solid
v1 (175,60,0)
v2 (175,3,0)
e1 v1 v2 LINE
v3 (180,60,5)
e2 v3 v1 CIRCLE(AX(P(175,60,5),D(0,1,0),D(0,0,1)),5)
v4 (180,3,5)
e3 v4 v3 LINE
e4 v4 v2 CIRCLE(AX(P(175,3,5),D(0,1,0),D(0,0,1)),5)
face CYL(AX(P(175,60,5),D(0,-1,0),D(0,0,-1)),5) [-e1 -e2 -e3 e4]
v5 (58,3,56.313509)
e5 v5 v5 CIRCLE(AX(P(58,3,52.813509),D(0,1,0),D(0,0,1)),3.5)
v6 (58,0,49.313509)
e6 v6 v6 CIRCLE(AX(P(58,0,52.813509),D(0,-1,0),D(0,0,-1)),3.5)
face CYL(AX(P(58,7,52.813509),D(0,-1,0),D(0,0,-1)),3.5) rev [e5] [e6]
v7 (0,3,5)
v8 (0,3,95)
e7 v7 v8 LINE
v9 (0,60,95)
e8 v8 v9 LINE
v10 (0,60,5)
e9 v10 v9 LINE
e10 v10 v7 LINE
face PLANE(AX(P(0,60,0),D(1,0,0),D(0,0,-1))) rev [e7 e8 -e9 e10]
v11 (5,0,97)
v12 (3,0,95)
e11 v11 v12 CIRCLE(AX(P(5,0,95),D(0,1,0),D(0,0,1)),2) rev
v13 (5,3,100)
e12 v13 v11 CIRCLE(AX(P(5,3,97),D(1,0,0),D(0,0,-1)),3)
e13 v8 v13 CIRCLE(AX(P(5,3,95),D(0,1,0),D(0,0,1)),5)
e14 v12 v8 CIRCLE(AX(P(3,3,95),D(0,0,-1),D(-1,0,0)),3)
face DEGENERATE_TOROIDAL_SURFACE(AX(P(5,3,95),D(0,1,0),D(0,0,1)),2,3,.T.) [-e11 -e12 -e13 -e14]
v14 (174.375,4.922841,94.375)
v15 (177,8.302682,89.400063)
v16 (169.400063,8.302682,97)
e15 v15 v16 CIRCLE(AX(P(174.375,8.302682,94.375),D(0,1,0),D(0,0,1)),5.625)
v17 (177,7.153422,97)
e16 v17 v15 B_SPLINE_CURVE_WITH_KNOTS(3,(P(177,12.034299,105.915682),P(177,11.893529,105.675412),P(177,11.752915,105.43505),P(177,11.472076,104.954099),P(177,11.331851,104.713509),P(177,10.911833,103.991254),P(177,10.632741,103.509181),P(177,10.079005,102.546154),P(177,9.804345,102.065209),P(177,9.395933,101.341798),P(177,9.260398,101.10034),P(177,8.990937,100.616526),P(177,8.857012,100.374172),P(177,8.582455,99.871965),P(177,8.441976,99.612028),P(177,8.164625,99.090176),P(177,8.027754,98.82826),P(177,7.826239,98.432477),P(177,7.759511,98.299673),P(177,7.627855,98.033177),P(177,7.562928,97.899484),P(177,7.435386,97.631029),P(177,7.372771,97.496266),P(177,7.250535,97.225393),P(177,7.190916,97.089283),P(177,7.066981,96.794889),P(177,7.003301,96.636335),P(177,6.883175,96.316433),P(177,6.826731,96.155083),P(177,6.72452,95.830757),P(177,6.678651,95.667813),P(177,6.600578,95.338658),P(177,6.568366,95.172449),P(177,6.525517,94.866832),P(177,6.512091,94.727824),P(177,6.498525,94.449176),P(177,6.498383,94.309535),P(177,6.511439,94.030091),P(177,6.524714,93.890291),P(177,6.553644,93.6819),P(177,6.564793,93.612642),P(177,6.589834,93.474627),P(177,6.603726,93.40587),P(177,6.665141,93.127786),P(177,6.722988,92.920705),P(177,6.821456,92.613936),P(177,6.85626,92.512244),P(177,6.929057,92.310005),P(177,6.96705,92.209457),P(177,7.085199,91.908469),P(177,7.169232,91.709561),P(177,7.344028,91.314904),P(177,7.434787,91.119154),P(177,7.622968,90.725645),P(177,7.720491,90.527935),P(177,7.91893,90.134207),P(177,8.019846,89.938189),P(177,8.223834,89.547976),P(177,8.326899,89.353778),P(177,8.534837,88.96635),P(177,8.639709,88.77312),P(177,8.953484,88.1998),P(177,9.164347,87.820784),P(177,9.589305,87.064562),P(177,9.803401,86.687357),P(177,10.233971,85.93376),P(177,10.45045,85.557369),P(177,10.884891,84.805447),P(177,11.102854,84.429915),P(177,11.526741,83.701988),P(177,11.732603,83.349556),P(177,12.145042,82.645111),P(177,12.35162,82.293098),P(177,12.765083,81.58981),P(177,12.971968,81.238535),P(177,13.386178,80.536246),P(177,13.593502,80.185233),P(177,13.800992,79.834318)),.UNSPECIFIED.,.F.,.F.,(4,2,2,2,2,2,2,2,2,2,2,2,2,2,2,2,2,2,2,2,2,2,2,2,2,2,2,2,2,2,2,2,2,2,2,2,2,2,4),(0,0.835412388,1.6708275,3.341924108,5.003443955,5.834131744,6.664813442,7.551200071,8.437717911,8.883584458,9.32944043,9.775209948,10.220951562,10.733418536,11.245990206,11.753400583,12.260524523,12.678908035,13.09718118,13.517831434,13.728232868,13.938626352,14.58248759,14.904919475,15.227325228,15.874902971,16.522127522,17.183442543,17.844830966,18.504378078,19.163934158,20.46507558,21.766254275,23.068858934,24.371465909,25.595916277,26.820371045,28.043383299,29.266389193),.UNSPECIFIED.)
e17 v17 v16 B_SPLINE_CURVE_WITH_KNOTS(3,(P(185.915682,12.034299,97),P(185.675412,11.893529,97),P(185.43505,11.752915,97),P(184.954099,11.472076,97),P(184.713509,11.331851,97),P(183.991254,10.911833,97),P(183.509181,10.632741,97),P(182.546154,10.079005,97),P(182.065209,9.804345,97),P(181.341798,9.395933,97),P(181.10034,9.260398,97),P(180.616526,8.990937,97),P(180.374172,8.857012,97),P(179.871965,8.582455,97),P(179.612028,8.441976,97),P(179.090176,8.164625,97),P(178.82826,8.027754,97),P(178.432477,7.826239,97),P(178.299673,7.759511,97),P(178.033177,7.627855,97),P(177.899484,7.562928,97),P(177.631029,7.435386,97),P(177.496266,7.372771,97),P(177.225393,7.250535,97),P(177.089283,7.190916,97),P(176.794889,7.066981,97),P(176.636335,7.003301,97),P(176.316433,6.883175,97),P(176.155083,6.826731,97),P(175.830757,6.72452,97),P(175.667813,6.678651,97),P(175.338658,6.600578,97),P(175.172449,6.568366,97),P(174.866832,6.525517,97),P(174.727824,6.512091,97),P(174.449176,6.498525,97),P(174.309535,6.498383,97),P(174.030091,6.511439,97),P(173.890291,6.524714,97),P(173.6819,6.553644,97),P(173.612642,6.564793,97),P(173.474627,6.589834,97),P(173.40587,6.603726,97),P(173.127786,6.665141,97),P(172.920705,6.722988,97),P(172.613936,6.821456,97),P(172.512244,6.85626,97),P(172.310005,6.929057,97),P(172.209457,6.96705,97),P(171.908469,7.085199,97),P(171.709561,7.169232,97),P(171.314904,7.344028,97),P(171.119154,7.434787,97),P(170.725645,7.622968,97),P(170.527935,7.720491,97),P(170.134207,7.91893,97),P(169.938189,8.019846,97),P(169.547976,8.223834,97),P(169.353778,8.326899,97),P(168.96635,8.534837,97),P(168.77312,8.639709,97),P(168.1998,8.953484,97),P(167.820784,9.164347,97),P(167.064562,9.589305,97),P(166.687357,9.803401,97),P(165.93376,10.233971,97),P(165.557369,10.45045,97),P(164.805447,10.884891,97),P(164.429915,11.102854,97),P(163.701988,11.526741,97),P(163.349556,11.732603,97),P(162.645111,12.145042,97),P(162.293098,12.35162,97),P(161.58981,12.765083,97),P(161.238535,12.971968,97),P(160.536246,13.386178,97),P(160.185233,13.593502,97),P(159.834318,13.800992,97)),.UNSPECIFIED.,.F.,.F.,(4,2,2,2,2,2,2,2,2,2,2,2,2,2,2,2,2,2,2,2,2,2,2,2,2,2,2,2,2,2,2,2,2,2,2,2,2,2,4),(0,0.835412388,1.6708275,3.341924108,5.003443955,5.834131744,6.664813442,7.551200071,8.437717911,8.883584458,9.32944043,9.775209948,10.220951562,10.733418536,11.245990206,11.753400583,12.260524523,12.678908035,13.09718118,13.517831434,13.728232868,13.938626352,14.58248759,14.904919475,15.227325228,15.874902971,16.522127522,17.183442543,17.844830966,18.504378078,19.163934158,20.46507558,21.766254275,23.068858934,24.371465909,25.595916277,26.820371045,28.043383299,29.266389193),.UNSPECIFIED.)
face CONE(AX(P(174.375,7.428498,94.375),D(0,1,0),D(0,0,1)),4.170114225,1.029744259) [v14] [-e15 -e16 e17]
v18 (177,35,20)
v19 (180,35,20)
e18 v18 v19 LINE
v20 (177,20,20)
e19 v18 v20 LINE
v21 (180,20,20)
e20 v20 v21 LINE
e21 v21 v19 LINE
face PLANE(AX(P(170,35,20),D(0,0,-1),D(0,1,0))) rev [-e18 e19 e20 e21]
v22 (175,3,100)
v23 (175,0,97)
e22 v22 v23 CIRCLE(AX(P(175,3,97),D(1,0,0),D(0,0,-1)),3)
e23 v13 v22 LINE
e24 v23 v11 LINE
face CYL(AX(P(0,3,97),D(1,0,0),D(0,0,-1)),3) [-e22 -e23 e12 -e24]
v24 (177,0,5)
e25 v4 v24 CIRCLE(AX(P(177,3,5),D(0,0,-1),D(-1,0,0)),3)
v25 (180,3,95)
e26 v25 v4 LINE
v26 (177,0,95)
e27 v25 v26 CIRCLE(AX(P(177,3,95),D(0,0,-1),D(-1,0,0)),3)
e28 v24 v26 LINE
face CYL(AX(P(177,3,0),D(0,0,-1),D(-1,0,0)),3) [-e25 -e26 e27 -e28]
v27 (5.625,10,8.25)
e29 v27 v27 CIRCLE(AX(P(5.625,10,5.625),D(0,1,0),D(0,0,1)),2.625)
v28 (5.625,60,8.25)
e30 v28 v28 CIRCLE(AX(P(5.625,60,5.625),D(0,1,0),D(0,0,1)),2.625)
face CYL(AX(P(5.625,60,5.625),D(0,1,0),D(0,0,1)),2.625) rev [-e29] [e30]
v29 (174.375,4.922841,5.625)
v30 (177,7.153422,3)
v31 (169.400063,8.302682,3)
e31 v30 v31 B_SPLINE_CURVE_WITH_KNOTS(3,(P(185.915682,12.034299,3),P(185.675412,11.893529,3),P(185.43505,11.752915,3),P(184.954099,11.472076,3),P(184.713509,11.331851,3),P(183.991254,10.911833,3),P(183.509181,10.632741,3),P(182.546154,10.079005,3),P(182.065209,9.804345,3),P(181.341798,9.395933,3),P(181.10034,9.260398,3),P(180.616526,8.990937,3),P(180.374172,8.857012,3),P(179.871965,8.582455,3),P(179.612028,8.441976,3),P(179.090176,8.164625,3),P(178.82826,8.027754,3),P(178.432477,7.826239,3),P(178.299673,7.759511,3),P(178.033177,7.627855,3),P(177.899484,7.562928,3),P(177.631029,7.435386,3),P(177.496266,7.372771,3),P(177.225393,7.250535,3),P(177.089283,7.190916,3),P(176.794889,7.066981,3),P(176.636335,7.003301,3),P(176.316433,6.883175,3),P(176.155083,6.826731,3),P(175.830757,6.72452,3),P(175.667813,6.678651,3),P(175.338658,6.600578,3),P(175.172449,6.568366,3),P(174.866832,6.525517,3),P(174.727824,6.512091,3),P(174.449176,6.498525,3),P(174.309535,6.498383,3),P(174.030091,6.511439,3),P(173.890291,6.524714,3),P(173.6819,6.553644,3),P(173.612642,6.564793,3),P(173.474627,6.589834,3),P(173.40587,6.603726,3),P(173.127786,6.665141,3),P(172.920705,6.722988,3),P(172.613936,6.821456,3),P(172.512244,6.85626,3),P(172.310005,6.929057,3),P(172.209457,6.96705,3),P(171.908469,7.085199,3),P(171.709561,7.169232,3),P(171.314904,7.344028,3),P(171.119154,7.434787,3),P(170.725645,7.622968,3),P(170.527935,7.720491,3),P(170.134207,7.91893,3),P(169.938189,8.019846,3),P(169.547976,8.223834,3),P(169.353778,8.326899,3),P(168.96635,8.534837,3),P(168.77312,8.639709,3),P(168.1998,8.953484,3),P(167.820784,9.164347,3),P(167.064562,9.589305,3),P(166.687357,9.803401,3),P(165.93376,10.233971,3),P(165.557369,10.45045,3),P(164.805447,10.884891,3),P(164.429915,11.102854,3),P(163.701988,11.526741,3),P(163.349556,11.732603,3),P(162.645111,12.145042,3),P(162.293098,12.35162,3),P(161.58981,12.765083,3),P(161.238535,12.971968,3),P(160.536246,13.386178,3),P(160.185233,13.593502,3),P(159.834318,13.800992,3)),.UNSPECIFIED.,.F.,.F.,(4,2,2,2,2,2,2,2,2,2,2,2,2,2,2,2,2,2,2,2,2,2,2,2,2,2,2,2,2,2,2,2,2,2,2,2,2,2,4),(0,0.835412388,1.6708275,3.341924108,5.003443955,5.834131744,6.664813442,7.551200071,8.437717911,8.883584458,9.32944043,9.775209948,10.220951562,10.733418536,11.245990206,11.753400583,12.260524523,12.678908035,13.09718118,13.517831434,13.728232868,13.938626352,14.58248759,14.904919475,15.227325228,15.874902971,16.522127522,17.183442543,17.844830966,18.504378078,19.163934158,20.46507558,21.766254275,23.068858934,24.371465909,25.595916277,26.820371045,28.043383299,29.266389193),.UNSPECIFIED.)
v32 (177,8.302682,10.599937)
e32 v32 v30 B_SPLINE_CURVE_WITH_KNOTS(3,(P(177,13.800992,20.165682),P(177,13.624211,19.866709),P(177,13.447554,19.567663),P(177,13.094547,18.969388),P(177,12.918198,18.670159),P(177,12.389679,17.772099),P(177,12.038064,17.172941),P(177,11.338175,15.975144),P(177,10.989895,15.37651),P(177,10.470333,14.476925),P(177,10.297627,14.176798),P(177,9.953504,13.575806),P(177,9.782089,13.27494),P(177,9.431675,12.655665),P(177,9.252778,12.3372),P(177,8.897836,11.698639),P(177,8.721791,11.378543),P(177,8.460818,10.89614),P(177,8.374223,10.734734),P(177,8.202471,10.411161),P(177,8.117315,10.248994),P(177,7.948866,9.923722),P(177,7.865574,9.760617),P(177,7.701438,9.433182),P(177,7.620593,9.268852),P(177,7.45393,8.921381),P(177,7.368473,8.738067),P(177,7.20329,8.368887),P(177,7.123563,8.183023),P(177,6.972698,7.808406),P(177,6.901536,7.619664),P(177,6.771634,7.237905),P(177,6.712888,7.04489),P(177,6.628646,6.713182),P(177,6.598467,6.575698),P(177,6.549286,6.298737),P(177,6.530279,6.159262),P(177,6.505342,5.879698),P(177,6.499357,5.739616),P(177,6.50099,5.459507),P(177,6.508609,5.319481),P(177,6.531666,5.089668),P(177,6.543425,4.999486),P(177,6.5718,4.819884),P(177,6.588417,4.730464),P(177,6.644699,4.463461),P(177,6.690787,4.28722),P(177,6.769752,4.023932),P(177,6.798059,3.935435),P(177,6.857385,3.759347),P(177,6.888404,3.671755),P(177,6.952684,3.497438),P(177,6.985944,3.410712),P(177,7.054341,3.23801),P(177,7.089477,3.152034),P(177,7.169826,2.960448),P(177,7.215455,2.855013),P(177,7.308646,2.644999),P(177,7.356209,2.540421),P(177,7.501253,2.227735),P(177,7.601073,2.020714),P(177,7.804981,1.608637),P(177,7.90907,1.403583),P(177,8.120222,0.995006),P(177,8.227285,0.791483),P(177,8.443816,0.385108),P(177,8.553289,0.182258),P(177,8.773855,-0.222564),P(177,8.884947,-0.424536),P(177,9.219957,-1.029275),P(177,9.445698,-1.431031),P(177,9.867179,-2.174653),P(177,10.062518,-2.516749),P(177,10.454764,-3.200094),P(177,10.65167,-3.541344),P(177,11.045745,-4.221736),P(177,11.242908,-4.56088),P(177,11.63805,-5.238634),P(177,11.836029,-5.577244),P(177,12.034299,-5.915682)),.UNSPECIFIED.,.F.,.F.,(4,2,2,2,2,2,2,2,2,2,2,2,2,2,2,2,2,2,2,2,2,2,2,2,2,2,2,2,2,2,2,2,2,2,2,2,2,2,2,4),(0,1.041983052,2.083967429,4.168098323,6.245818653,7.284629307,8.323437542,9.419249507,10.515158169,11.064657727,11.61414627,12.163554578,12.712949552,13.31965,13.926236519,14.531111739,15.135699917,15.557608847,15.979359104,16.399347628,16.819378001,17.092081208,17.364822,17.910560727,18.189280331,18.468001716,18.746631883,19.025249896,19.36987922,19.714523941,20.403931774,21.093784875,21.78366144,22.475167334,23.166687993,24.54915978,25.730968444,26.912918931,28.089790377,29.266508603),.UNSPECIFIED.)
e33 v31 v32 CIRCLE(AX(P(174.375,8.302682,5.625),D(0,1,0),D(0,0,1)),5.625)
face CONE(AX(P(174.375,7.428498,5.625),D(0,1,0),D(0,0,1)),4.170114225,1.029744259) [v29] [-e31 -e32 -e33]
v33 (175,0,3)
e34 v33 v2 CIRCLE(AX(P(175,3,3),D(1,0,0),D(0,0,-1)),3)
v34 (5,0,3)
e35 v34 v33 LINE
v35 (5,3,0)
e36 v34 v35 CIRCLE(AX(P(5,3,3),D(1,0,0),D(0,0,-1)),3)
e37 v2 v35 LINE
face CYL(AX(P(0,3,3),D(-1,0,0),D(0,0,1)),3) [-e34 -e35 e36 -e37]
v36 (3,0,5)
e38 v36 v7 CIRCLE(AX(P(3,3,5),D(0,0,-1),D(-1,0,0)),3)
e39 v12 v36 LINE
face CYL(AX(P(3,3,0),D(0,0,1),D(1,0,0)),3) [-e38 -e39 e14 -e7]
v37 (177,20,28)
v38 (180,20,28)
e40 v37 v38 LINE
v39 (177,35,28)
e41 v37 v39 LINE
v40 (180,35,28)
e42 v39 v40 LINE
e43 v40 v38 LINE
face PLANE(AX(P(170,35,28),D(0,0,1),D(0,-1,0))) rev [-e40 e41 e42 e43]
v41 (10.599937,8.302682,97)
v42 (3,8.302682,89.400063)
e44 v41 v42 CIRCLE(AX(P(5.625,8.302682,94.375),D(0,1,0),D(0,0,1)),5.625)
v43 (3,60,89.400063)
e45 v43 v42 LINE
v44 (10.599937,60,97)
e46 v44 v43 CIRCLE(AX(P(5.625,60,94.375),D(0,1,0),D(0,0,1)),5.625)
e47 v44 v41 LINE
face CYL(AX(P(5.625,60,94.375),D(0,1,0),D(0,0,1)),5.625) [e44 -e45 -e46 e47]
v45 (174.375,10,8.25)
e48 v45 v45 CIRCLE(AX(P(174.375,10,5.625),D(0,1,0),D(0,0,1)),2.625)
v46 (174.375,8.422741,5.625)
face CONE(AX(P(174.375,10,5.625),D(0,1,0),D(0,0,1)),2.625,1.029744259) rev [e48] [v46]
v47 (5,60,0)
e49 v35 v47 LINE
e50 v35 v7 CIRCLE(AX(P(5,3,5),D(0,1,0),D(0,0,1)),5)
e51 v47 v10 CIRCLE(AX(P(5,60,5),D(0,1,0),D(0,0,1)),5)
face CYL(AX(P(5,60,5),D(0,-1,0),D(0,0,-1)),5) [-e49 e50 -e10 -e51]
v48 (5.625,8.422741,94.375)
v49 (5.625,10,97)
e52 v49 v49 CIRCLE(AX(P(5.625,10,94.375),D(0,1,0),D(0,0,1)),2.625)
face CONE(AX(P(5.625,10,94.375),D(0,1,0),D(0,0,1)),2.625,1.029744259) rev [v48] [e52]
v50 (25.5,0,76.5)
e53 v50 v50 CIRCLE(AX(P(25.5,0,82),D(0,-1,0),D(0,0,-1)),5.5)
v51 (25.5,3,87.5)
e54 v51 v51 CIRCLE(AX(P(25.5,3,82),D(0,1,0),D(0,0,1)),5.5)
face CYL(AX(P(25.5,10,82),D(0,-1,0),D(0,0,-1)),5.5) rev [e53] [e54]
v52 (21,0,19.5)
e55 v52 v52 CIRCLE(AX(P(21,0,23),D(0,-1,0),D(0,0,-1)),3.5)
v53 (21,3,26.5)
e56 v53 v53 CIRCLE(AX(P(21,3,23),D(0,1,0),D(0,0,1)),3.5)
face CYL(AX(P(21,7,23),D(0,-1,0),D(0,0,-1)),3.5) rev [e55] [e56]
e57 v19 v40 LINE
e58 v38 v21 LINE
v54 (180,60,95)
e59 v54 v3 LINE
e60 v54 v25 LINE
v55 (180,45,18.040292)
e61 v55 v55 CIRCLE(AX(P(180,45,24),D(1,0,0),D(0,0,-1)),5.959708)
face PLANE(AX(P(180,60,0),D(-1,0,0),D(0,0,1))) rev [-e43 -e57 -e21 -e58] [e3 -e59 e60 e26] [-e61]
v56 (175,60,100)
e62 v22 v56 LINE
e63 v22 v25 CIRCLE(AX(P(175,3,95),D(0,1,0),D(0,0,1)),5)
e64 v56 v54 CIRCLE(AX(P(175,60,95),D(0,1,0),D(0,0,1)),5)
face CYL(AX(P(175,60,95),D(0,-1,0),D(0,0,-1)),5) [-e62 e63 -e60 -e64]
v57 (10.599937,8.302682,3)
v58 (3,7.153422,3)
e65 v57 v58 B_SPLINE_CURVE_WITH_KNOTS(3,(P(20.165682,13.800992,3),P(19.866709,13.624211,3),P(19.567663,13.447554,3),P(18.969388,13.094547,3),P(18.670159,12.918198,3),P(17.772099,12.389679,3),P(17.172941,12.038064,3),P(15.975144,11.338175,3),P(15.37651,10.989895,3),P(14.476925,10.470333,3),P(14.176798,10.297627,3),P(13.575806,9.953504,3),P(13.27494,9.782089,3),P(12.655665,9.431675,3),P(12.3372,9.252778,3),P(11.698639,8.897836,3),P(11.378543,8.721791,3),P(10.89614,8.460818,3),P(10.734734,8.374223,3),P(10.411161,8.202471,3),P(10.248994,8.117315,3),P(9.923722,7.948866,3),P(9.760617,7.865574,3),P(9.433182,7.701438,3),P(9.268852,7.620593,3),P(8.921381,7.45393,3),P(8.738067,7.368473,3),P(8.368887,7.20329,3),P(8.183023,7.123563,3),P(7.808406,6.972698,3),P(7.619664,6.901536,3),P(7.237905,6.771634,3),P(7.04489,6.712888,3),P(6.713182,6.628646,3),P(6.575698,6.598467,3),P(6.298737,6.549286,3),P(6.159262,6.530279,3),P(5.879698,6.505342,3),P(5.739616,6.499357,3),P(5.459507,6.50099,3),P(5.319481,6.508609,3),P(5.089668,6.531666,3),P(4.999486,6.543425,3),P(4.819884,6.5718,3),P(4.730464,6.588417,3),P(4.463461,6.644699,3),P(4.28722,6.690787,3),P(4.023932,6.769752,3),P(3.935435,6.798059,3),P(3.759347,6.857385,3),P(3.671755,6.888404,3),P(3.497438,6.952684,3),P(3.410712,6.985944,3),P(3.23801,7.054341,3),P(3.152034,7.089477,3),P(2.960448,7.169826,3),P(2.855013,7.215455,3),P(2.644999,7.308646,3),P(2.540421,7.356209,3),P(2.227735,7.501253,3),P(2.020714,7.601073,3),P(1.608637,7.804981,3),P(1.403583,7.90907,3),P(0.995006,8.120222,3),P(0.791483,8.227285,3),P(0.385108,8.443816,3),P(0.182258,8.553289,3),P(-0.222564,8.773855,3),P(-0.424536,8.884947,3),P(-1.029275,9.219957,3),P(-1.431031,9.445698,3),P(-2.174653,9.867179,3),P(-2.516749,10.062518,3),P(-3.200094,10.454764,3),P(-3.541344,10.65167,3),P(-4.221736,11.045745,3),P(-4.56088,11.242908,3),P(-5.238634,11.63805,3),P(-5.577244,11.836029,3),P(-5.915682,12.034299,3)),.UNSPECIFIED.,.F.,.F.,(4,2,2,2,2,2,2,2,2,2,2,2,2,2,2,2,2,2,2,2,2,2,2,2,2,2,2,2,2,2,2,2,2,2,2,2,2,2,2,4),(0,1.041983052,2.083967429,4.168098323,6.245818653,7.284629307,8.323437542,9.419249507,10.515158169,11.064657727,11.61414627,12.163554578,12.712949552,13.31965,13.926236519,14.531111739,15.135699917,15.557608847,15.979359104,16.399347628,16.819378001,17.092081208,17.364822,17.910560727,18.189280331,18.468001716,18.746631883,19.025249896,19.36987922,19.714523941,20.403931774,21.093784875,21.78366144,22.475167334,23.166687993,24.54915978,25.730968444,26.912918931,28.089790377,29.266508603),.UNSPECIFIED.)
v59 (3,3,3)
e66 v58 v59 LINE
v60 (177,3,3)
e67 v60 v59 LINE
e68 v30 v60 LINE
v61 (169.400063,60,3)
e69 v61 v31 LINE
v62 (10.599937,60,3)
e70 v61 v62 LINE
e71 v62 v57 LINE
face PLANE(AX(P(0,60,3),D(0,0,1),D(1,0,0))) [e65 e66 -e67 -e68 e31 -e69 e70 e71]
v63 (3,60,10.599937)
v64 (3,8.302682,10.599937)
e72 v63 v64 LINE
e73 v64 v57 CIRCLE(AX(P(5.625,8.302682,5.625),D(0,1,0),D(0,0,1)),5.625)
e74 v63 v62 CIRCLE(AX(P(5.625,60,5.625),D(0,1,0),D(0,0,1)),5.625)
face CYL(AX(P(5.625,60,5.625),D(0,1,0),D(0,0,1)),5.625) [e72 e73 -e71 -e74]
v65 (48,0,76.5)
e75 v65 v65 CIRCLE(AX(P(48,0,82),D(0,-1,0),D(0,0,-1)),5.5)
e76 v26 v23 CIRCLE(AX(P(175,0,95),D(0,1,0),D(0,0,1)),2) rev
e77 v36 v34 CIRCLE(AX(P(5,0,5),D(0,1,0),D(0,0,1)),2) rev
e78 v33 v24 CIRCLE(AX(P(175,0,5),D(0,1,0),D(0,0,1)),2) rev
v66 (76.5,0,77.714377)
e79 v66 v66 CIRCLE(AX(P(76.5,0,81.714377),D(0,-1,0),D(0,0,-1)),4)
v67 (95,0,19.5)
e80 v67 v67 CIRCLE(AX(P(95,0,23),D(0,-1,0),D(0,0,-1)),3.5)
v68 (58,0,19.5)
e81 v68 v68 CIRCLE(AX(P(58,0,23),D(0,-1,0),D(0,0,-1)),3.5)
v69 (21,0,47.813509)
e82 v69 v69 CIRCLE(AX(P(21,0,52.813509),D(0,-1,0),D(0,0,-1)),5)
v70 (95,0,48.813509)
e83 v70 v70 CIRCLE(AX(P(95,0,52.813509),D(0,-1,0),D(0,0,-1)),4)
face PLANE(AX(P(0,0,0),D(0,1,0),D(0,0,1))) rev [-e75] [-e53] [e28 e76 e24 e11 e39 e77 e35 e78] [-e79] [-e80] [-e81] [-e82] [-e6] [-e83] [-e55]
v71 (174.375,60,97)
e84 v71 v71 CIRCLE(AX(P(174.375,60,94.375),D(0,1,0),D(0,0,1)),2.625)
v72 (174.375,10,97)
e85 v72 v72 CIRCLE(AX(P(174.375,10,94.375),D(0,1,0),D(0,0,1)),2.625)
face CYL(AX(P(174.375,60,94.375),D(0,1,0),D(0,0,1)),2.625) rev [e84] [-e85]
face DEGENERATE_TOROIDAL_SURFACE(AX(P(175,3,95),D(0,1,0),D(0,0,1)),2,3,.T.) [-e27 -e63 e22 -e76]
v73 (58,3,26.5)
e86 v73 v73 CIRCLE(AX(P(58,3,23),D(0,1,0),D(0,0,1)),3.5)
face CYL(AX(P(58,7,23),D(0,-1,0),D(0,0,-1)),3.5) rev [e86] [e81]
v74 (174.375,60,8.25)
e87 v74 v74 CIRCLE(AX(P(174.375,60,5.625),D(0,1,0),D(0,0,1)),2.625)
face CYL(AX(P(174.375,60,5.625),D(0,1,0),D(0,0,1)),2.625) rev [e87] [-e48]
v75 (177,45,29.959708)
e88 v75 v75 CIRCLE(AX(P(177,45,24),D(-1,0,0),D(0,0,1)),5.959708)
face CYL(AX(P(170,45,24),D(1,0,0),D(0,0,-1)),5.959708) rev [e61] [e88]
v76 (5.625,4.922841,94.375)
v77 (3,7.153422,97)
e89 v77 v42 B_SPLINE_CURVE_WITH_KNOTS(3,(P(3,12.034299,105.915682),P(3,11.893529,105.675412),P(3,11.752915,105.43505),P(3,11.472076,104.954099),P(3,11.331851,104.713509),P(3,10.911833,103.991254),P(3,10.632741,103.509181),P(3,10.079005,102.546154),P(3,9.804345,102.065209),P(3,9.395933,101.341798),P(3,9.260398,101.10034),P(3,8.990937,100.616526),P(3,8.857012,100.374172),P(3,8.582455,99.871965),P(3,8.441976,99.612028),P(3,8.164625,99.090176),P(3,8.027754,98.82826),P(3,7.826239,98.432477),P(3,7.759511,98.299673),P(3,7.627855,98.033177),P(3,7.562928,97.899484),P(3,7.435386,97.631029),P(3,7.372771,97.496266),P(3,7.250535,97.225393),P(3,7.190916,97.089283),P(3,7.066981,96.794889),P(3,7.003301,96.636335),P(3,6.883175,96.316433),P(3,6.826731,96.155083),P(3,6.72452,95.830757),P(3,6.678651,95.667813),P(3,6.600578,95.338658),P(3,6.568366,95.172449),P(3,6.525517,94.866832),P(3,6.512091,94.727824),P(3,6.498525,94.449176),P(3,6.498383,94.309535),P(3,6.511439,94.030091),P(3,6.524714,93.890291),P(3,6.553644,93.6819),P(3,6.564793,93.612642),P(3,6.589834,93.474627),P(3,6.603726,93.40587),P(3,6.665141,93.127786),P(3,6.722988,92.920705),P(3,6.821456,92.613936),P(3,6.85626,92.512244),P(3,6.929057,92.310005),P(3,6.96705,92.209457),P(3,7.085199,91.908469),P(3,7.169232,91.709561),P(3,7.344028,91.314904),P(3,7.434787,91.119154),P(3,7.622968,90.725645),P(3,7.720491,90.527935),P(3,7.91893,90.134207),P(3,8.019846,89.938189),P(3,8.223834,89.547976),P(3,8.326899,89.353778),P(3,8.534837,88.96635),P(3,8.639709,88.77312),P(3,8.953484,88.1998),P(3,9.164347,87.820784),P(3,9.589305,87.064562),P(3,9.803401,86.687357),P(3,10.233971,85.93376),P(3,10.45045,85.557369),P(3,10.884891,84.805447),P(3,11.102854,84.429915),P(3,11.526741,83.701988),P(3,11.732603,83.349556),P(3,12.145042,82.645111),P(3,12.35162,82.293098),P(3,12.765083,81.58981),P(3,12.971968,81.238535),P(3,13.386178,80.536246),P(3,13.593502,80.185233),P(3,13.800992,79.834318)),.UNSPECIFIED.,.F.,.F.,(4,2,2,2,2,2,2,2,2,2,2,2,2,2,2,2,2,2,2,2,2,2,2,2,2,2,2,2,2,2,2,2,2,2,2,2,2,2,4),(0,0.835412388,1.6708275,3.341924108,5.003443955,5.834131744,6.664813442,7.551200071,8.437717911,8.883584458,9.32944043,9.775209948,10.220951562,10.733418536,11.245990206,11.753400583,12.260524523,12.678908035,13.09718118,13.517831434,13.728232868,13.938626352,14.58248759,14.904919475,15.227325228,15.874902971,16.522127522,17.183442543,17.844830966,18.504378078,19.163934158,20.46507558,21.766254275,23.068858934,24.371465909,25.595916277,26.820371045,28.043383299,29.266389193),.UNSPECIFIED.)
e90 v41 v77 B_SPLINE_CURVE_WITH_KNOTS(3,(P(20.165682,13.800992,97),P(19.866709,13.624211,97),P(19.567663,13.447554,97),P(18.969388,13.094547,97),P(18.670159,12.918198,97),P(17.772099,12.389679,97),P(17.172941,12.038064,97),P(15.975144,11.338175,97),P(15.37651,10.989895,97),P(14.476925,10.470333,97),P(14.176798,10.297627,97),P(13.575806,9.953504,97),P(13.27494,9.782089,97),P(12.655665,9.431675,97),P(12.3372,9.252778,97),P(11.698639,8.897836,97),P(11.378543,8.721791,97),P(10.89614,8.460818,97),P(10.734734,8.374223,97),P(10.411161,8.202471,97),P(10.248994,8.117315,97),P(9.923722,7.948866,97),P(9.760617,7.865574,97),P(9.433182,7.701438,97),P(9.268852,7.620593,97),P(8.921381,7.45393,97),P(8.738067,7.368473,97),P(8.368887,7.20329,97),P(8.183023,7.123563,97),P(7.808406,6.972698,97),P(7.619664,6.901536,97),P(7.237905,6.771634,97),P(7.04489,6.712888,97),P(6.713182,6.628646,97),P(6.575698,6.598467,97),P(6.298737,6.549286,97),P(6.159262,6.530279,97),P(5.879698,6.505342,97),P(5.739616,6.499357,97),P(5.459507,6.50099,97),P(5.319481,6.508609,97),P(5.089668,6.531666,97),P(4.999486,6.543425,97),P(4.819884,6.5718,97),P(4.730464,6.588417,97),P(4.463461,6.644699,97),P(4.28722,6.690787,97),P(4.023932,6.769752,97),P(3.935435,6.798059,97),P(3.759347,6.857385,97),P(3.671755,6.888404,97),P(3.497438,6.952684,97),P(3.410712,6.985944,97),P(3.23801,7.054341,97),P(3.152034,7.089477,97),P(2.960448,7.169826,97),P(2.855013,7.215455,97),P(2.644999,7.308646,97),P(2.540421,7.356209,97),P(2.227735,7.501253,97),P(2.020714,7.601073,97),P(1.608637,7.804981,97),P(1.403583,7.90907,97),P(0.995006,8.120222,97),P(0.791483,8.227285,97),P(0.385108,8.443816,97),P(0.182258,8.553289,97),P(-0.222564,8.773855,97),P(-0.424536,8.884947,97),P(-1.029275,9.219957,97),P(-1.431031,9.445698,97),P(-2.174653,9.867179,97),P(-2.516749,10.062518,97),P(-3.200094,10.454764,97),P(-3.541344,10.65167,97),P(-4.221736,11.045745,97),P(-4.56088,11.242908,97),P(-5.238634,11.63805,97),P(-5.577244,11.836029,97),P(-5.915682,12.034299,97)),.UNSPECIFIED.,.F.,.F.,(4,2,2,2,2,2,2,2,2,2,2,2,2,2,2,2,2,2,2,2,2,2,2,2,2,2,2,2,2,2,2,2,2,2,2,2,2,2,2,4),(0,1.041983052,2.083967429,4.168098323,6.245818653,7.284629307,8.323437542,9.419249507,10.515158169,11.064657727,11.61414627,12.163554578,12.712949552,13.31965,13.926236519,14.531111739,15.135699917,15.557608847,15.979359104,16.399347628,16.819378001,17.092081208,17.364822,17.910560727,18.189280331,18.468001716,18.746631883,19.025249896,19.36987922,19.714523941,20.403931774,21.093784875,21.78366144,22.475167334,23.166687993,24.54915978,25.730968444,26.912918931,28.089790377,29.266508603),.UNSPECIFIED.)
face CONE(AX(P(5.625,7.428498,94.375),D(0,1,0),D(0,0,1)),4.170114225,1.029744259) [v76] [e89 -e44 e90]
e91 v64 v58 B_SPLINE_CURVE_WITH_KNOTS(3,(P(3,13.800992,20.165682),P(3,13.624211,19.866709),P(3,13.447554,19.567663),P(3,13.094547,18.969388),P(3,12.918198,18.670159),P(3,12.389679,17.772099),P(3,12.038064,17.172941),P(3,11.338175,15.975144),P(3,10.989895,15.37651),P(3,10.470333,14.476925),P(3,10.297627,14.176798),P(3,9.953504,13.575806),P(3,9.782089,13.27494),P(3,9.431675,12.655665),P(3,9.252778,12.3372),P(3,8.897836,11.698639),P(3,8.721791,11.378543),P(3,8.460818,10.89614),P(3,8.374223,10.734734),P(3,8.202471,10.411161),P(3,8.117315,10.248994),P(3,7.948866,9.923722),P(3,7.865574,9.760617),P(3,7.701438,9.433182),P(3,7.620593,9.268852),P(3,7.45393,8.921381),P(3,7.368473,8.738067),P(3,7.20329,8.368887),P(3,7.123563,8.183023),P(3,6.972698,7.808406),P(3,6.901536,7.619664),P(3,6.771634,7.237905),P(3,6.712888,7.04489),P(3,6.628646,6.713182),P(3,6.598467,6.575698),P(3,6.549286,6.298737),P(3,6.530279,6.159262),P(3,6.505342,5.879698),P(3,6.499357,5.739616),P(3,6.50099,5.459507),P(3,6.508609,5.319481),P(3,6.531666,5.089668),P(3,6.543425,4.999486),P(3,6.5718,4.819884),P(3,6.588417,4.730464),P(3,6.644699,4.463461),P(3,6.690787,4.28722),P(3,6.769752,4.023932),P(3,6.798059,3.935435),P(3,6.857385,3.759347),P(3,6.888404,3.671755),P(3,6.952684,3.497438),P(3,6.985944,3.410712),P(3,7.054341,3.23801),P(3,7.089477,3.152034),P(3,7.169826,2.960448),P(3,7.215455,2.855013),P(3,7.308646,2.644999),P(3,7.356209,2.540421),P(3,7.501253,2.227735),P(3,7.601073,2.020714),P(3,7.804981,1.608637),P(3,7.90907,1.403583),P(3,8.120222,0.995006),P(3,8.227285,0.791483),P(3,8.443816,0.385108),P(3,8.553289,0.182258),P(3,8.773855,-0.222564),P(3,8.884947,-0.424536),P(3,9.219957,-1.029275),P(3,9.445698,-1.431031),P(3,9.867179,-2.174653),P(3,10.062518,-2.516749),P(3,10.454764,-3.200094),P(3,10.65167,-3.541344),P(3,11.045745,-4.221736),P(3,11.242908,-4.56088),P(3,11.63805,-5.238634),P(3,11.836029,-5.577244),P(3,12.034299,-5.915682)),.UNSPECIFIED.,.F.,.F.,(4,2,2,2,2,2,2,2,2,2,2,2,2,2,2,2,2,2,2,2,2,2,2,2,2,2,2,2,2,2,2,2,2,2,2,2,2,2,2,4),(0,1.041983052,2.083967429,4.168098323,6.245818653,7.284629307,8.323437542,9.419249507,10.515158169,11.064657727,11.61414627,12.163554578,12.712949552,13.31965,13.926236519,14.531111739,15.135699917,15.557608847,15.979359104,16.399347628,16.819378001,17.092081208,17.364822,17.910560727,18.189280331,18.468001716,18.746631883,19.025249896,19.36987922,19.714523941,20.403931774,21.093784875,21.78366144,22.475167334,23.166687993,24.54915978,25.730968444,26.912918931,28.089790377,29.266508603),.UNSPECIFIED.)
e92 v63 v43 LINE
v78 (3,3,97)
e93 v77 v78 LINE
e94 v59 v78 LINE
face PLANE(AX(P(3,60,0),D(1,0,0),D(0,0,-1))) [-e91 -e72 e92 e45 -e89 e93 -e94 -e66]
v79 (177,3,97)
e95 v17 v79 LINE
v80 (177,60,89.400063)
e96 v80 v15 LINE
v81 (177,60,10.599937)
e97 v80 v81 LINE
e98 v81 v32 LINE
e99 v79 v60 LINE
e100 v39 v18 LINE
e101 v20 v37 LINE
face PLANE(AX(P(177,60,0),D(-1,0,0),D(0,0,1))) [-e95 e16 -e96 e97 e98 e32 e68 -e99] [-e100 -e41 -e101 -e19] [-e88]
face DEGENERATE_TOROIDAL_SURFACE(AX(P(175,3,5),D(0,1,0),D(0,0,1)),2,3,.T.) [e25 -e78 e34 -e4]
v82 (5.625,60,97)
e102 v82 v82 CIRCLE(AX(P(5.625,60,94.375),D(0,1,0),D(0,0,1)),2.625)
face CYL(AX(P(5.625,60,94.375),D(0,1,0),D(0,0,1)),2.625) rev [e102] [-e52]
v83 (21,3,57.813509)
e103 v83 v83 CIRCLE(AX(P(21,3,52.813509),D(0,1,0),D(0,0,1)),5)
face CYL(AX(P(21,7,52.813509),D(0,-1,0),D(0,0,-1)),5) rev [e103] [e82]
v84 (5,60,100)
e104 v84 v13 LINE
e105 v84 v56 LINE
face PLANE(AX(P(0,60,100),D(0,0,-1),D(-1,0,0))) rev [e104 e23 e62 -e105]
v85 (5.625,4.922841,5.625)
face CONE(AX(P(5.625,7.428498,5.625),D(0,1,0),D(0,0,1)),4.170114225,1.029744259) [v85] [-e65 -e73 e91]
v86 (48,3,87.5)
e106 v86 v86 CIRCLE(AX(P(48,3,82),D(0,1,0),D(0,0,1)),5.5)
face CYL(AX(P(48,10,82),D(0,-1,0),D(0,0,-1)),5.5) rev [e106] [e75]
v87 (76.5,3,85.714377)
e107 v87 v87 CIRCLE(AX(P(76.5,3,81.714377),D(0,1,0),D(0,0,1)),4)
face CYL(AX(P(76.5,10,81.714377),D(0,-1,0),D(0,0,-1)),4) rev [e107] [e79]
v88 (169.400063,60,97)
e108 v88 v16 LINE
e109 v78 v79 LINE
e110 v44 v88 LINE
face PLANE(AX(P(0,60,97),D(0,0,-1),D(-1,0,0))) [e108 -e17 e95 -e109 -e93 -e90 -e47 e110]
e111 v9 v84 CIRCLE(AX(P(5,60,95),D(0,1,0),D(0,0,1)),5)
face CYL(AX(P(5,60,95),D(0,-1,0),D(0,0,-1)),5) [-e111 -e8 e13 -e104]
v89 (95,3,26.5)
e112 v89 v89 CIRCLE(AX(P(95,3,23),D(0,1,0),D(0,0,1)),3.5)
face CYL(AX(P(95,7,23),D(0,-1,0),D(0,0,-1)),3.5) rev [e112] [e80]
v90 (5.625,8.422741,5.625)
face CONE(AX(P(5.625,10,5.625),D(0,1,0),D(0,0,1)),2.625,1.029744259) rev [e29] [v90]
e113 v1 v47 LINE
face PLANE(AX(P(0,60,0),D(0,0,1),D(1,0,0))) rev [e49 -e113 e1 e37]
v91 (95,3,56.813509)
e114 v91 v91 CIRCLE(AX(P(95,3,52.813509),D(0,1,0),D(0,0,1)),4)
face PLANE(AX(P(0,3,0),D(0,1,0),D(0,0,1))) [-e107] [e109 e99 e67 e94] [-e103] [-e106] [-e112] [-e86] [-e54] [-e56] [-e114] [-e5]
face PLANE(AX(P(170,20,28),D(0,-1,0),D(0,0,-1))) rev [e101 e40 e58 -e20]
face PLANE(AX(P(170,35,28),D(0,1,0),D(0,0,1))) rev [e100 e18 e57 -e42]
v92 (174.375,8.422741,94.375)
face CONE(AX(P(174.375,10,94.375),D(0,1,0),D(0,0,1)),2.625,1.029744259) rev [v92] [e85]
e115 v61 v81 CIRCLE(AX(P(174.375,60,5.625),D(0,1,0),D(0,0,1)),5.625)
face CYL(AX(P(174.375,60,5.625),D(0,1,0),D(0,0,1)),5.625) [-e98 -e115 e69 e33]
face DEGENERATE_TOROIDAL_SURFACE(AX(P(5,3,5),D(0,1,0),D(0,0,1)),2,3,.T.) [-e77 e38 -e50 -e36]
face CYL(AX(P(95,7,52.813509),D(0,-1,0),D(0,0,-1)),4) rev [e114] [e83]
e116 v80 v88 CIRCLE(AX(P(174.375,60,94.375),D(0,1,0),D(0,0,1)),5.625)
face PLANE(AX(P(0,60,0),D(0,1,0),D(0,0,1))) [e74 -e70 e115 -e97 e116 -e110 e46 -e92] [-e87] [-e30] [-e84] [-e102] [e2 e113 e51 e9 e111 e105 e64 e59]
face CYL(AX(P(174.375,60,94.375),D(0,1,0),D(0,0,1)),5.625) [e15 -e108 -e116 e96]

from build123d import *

# Parameters (mm, degrees)
SKETCH1_W                 = 180
SKETCH1_H                 = 100
BOSS_EXTRUDE1_DEPTH       = 60
F_3_0MM_DOWEL_HOLE1_D     = 5.25
F_3_0MM_DOWEL_HOLE1_DEPTH = 50
F_3_0MM_DOWEL_HOLE1_TIP   = 1.577259125
SHELL2_START              = 3
SHELL2_DEPTH              = 57
SHELL2_2_DEPTH            = 5.302681665
FILLET1_R                 = 5
FILLET2_R                 = 3
SKETCH4_R                 = 5.959707521
SKETCH4_W                 = 8
SKETCH4_H                 = 15
CUT_EXTRUDE1_DEPTH        = 10
SKETCH6_R                 = 5.5
CUT_EXTRUDE2_DEPTH        = 10
SKETCH9_R                 = 3.5
SKETCH9_R_2               = 5
SKETCH9_R_3               = 4
CUT_EXTRUDE3_DEPTH        = 7
SKETCH10_R                = 4
CUT_EXTRUDE4_DEPTH        = 10


with BuildPart() as part:
    # Sketch1 → Boss-Extrude1 (new body)
    with BuildSketch(Plane(origin=(0, 0, 0), x_dir=(1, 0, 0), z_dir=(0, 1, 0))):
        with Locations((90, -50)):
            Rectangle(SKETCH1_W, SKETCH1_H)
    extrude(amount=BOSS_EXTRUDE1_DEPTH)

    # Ø3.0mm Dowel Hole1
    with Locations(Plane(origin=(0, 60, 0), x_dir=(1, 0, 0), z_dir=(0, 1, 0))):
        with Locations((5.625, -5.625), (174.375, -5.625), (5.625, -94.375), (174.375, -94.375)):
            Hole(F_3_0MM_DOWEL_HOLE1_D / 2, depth=F_3_0MM_DOWEL_HOLE1_DEPTH)
            with Locations((0, 0, -(F_3_0MM_DOWEL_HOLE1_DEPTH + F_3_0MM_DOWEL_HOLE1_TIP / 2))):  # 118° drill point
                Cone(0, F_3_0MM_DOWEL_HOLE1_D / 2, F_3_0MM_DOWEL_HOLE1_TIP, mode=Mode.SUBTRACT)

    # Shell2: read off the stored shape, not the designer's step
    # Shell2 outline → Shell2 (cut)
    with BuildSketch(Plane(origin=(0, 0, 0), x_dir=(1, 0, 0), z_dir=(0, 1, 0)).offset(SHELL2_START)):
        with BuildLine():
            Line((169.400062814, -3), (10.599937186, -3))
            ThreePointArc((10.599937186, -3), (9.602475644, -9.602475644), (3, -10.599937186))
            Line((3, -10.599937186), (3, -89.400062814))
            ThreePointArc((3, -89.400062814), (9.602475644, -90.397524356), (10.599937186, -97))
            Line((10.599937186, -97), (169.400062814, -97))
            ThreePointArc((169.400062814, -97), (170.397524356, -90.397524356), (177, -89.400062814))
            Line((177, -89.400062814), (177, -10.599937186))
            ThreePointArc((177, -10.599937186), (170.397524356, -9.602475644), (169.400062814, -3))
        make_face()
    extrude(amount=SHELL2_DEPTH, mode=Mode.SUBTRACT)

    # Shell2 2 outline → Shell2 2 (cut)
    with BuildSketch(Plane(origin=(0, 0, 0), x_dir=(1, 0, 0), z_dir=(0, 1, 0)).offset(SHELL2_START)):
        with BuildLine():
            Line((10.599937186, -3), (3, -3))
            Line((3, -3), (3, -10.599937186))
            ThreePointArc((3, -10.599937186), (9.602475644, -9.602475644), (10.599937186, -3))
        make_face()
        with BuildLine():
            Line((177, -3), (169.400062814, -3))
            ThreePointArc((169.400062814, -3), (170.397524356, -9.602475644), (177, -10.599937186))
            Line((177, -10.599937186), (177, -3))
        make_face()
        with BuildLine():
            ThreePointArc((10.599937186, -97), (9.602475644, -90.397524356), (3, -89.400062814))
            Line((3, -89.400062814), (3, -97))
            Line((3, -97), (10.599937186, -97))
        make_face()
        with BuildLine():
            Line((177, -97), (177, -89.400062814))
            ThreePointArc((177, -89.400062814), (170.397524356, -90.397524356), (169.400062814, -97))
            Line((169.400062814, -97), (177, -97))
        make_face()
    extrude(amount=SHELL2_2_DEPTH, mode=Mode.SUBTRACT)

    # Shell2 3 outline → Shell2 3 (revolve)
    with BuildSketch(Plane(origin=(5.625, 0, 94.375), x_dir=(1, 0, 0), z_dir=(0, 0, 1))):
        Polygon((0, 8.302681673), (0, 4.922840683), (5.625000013, 8.302681673), align=None)
    revolve(axis=Axis((5.625, 0, 94.375), (0, 1, 0)))

    # Shell2 4 outline → Shell2 4 (revolve)
    with BuildSketch(Plane(origin=(174.375, 0, 94.375), x_dir=(1, 0, 0), z_dir=(0, 0, 1))):
        Polygon((0, 8.302681665), (0, 4.922840683), (5.625, 8.302681665), align=None)
    revolve(axis=Axis((174.375, 0, 94.375), (0, 1, 0)))

    # Shell2 5 outline → Shell2 5 (revolve)
    with BuildSketch(Plane(origin=(174.375, 0, 5.625), x_dir=(1, 0, 0), z_dir=(0, 0, 1))):
        Polygon((0, 8.302681673), (0, 4.922840683), (5.625000013, 8.302681673), align=None)
    revolve(axis=Axis((174.375, 0, 5.625), (0, 1, 0)))

    # Shell2 6 outline → Shell2 6 (revolve)
    with BuildSketch(Plane(origin=(5.625, 0, 5.625), x_dir=(1, 0, 0), z_dir=(0, 0, 1))):
        Polygon((0, 8.302681673), (0, 4.922840683), (5.625000013, 8.302681673), align=None)
    revolve(axis=Axis((5.625, 0, 5.625), (0, 1, 0)))

    # Fillet1
    fillet1_edges = [part.edges().sort_by_distance(p)[0] for p in [
        (0, 30, 0),
        (180, 30, 0),
        (180, 30, 100),
        (0, 30, 100),
    ]]
    fillet(fillet1_edges, radius=FILLET1_R)

    # Fillet2
    fillet2_edges = [part.edges().sort_by_distance(p)[0] for p in [
        (0, 0, 50),
        (90, 0, 0),
        (180, 0, 50),
        (90, 0, 100),
        (1.464466094, 0, 98.535533906),
        (178.535533906, 0, 98.535533906),
        (178.535533906, 0, 1.464466094),
        (1.464466094, 0, 1.464466094),
    ]]
    fillet(fillet2_edges, radius=FILLET2_R)

    # Sketch4 → Cut-Extrude1 (cut)
    with BuildSketch(Plane(origin=(180, 0, 0), x_dir=(0, 0, -1), z_dir=(1, 0, 0))):
        with Locations((-24, 45)):
            Circle(SKETCH4_R)
        with Locations((-24, 27.5)):
            Rectangle(SKETCH4_W, SKETCH4_H)
    extrude(amount=-CUT_EXTRUDE1_DEPTH, mode=Mode.SUBTRACT)

    # Sketch6 → Cut-Extrude2 (cut)
    with BuildSketch(Plane.XZ):
        with Locations(Location((25.5, 82, 0), (0, 0, 270))):
            Circle(SKETCH6_R)
        with Locations(Location((48, 82, 0), (0, 0, 270))):
            Circle(SKETCH6_R)
    extrude(amount=-CUT_EXTRUDE2_DEPTH, mode=Mode.SUBTRACT)

    # Sketch9 → Cut-Extrude3 (cut)
    with BuildSketch(Plane.XZ):
        with Locations(Location((21, 23, 0), (0, 0, 270))):
            Circle(SKETCH9_R)
        with Locations(Location((58, 23, 0), (0, 0, 270))):
            Circle(SKETCH9_R)
        with Locations(Location((95, 23, 0), (0, 0, 270))):
            Circle(SKETCH9_R)
        with Locations(Location((21, 52.813509344, 0), (0, 0, 270))):
            Circle(SKETCH9_R_2)
        with Locations(Location((58, 52.813509344, 0), (0, 0, 270))):
            Circle(SKETCH9_R)
        with Locations(Location((95, 52.813509344, 0), (0, 0, 270))):
            Circle(SKETCH9_R_3)
    extrude(amount=-CUT_EXTRUDE3_DEPTH, mode=Mode.SUBTRACT)

    # Sketch10 → Cut-Extrude4 (cut)
    with BuildSketch(Plane.XZ):
        with Locations(Location((76.5, 81.714376639, 0), (0, 0, 270))):
            Circle(SKETCH10_R)
    extrude(amount=-CUT_EXTRUDE4_DEPTH, mode=Mode.SUBTRACT)


solid = part.part
